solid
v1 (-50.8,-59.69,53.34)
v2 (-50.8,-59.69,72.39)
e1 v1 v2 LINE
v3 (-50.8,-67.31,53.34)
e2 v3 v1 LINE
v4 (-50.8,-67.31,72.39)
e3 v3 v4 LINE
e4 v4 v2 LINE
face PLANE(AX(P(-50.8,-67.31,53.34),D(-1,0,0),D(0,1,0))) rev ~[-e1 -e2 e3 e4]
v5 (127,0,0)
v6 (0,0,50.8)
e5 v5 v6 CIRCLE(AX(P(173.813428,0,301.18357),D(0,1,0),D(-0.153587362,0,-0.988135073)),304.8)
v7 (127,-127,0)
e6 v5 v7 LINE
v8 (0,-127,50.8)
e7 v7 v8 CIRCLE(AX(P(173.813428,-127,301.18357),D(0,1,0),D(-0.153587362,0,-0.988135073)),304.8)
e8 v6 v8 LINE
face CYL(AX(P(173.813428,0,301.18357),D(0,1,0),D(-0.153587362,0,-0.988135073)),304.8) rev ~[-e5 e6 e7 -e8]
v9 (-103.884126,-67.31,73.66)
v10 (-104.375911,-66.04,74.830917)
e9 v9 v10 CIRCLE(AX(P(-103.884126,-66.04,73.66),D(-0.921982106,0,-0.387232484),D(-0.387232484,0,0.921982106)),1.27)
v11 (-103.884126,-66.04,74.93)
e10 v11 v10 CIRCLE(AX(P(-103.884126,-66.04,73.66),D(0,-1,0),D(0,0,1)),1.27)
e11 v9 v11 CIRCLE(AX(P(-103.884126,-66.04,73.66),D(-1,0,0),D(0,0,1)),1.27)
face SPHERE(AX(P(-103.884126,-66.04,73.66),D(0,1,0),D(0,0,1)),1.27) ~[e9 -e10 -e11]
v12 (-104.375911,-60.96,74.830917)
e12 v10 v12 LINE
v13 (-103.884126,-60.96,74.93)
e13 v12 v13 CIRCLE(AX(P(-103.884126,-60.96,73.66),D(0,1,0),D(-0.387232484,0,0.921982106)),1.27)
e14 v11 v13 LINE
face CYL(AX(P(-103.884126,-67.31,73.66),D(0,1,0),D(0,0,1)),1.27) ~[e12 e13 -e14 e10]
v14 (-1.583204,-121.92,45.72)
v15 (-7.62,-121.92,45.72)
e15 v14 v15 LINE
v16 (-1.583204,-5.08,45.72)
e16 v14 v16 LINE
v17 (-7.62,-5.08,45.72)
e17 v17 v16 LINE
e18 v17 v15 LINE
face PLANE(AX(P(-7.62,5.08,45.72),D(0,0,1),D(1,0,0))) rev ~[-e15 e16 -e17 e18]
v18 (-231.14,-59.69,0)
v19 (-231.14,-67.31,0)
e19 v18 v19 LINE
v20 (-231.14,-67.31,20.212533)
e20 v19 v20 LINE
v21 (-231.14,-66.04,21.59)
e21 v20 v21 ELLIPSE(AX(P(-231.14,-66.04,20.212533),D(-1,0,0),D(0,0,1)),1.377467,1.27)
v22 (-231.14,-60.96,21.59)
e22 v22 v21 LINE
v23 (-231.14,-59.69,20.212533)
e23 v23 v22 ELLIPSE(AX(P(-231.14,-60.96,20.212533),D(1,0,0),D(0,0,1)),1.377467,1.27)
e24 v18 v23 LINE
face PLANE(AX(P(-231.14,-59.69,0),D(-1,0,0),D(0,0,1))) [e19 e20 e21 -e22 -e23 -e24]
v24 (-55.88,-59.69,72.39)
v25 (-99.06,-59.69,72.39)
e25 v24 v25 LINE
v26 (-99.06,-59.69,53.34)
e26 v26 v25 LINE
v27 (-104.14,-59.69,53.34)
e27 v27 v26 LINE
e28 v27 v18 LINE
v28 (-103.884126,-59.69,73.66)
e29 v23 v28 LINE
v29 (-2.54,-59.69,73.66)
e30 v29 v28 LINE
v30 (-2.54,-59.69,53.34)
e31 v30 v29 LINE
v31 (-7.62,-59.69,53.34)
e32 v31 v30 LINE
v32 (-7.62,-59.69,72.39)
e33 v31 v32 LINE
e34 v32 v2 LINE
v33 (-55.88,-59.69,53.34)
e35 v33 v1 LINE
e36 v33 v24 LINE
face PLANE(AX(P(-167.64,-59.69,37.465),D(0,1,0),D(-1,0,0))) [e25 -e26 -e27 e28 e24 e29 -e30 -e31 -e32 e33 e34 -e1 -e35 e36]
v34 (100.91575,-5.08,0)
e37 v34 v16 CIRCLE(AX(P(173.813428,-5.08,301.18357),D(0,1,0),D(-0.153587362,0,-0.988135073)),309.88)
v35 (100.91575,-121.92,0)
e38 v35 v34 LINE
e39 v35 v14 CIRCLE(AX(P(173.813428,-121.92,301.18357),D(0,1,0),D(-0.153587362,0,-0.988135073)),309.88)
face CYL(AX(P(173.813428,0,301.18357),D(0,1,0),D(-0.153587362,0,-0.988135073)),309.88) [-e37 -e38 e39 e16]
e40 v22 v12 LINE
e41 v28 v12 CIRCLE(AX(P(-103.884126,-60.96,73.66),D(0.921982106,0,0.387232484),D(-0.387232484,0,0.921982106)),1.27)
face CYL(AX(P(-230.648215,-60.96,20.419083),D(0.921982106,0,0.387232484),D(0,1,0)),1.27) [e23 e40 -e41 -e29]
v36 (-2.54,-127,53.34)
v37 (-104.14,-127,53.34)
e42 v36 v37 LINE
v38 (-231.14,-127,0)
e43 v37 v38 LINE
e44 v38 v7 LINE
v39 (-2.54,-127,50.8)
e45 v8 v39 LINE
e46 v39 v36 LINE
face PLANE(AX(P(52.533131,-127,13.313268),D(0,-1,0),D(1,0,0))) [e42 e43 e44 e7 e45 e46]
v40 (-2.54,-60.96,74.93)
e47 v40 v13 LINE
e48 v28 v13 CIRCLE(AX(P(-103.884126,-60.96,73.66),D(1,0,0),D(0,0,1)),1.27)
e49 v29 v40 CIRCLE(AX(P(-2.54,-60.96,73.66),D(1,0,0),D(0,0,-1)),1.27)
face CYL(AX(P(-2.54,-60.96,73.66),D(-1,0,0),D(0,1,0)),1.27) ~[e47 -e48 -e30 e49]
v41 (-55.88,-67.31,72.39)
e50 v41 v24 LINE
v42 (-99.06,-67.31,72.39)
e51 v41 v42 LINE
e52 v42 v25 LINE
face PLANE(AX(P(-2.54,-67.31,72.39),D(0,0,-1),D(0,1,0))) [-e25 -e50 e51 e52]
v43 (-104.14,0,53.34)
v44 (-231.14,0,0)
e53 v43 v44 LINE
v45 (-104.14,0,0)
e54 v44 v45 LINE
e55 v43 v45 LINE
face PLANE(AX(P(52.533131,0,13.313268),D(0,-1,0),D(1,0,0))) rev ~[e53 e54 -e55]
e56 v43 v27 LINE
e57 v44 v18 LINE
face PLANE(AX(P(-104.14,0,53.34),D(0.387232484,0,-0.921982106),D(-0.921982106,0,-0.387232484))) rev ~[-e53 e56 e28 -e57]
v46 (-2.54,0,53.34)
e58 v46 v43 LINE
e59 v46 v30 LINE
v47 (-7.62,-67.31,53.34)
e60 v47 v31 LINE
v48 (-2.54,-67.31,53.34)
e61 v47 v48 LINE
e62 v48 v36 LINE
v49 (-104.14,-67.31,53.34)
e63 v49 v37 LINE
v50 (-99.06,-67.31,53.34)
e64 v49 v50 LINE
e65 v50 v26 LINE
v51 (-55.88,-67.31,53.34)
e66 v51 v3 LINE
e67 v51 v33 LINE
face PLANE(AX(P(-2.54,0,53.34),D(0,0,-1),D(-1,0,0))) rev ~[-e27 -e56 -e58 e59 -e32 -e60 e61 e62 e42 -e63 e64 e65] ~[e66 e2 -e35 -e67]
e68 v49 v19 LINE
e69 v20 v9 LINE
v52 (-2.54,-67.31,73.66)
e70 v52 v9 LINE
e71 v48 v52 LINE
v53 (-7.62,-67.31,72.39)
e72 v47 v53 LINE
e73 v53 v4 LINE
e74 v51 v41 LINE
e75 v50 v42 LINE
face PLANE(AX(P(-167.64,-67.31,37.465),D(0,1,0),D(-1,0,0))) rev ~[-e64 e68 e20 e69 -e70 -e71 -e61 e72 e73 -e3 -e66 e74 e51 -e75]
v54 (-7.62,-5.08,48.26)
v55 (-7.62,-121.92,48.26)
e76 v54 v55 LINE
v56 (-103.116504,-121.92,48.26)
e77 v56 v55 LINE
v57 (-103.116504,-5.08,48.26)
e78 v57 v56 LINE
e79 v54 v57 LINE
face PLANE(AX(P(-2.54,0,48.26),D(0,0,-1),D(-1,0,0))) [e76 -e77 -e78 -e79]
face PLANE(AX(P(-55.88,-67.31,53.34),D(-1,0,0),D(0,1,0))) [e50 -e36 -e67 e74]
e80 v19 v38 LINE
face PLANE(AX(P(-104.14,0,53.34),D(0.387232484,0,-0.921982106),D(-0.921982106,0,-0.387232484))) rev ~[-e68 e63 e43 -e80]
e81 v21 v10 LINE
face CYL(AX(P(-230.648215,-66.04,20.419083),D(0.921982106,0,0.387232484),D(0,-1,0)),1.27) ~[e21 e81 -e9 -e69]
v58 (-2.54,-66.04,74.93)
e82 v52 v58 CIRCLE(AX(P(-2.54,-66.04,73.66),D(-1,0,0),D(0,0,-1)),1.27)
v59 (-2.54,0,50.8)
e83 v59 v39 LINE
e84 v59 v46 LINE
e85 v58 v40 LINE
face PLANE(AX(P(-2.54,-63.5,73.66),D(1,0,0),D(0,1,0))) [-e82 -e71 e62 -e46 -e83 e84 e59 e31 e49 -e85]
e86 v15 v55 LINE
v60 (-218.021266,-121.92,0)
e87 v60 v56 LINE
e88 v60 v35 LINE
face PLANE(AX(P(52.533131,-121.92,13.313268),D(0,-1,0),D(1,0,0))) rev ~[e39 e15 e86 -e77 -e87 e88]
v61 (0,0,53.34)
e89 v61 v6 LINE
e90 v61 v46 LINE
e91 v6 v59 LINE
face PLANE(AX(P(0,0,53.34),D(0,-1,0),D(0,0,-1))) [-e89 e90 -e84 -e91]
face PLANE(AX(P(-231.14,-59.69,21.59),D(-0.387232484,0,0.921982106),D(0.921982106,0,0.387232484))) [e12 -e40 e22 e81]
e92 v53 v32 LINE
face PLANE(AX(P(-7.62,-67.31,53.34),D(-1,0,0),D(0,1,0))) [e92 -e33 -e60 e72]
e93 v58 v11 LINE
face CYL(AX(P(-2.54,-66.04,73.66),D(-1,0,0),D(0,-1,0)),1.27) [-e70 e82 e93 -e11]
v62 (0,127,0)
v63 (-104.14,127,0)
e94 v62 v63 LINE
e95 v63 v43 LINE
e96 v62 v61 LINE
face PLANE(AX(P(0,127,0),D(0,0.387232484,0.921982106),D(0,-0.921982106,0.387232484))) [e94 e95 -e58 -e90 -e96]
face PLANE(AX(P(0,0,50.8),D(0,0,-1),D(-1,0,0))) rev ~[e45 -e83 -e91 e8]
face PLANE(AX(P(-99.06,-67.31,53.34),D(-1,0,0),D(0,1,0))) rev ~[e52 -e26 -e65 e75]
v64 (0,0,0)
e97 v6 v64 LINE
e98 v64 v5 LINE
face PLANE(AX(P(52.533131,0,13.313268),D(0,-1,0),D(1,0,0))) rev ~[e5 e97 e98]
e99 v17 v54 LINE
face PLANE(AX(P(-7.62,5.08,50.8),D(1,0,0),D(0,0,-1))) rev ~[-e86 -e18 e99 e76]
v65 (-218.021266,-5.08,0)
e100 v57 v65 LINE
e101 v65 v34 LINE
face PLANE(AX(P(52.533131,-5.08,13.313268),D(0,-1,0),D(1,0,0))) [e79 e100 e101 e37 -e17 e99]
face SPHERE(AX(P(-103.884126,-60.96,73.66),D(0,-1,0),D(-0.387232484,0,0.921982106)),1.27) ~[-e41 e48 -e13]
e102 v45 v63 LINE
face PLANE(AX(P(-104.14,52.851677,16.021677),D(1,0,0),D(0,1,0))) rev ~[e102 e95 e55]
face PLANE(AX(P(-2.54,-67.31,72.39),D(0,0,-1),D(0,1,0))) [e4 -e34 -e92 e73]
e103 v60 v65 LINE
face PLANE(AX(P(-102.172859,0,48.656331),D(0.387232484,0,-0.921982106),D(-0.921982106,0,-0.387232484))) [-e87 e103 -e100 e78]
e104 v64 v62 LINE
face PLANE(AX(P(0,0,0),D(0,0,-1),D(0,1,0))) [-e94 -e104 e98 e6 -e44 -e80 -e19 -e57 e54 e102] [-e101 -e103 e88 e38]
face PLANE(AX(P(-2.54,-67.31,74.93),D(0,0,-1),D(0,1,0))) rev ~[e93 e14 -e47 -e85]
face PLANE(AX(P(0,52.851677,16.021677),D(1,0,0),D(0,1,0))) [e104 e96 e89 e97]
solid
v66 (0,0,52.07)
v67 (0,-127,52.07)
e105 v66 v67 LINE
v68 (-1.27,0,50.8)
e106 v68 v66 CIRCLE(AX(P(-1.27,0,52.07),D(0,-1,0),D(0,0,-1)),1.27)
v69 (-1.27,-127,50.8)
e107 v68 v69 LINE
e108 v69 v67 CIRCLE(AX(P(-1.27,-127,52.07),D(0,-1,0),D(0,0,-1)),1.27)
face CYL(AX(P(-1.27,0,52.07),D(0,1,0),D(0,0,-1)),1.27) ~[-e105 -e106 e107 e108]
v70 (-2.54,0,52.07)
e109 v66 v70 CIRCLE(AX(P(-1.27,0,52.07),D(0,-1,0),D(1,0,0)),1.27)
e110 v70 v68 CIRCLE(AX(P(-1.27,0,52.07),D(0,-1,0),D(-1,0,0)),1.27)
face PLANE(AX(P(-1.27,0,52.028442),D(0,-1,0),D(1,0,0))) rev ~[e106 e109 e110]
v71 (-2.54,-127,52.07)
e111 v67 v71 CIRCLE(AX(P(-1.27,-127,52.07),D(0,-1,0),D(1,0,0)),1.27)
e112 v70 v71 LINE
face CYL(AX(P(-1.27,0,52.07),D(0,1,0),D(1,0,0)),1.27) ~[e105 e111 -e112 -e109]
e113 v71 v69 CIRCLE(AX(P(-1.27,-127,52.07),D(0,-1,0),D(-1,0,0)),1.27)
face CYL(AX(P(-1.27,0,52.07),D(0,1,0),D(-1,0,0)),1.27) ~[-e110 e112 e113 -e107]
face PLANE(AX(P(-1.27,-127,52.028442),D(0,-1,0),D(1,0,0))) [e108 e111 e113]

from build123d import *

# Parameters (mm, degrees)
F1_DEPTH     = 127
F2_W         = 5.08
F2_H         = 7.62
F3_DEPTH     = 19.05
F4_W         = 7.62
F4_H         = 2.54
F5_DEPTH     = 101.6
F6_T         = 5.08
F6_T3_DEPTH  = 17.78
F6_T5_DEPTH  = 15.24
F6_T7_DEPTH  = 15.24
F6_T9_DEPTH  = 15.24
F6_T11_DEPTH = 137.16
F8_DEPTH     = 7.62
F10_DEPTH    = 104.14
F11_R        = 1.27


# Not quite as in the source:
# - a shell that OpenCascade refuses in one call is made with other operations: the cavity is built on its own and cut out
# - a feature names something its author has since deleted; it is built from what else it names


with BuildPart() as f1:
    # F0 (on Front) → F1 (new body)
    with BuildSketch(Plane.XZ):
        with BuildLine():
            Line((0, 50.8), (0, 0))
            Line((0, 0), (127, 0))
            ThreePointArc((127, 0), (60.6135499229, 18.1838748072), (0, 50.8))
        make_face()
        Polygon((-104.14, 0), (-2.54, 0), (-2.54, 50.8), (-2.54, 52.07), (-2.54, 53.34), (-104.14, 53.34), align=None)
        Polygon((-2.54, 0), (0, 0), (0, 50.8), (-1.27, 50.8), (-2.54, 50.8), align=None)
        Polygon((-231.14, 0), (-104.14, 0), (-104.14, 53.34), align=None)
    extrude(amount=F1_DEPTH)

    # F2 (on face) → F3 (join)
    with BuildSketch(Plane.XY.offset(53.34)):
        with Locations((-101.6, -63.5)):
            Rectangle(F2_W, F2_H)
        with Locations((-5.08, -63.5)):
            Rectangle(F2_W, F2_H)
        with Locations((-53.34, -63.5)):
            Rectangle(F2_W, F2_H)
    extrude(amount=F3_DEPTH)

    # F4 (on face) → F5 (join)
    with BuildSketch(Plane.YZ.offset(-2.54)):
        with Locations((-63.5, 73.66)):
            Rectangle(F4_W, F4_H)
    extrude(amount=-F5_DEPTH)

    # F6: shell of thickness 5.08, made by hand


with BuildPart() as f1b:
    # F0 (on Front) → F1, piece 2 (new body)
    with BuildSketch(Plane.XZ):
        with BuildLine():
            ThreePointArc((-2.54, 52.07), (-2.1680256121, 51.1719743879), (-1.27, 50.8))
            ThreePointArc((-1.27, 50.8), (-0.3719743879, 51.1719743879), (0, 52.07))
            ThreePointArc((0, 52.07), (-1.27, 53.34), (-2.54, 52.07))
        make_face()
    extrude(amount=F1_DEPTH)


with BuildPart() as f6_core1:
    # F6_t2: copy of F1
    add(f1.part)

    # the walls: a layer under each face that stays
    f6_faces = [f6_core1.faces().sort_by_distance(p)[0] for p in [
        (60.6135499229, -63.5, 18.1838748072),
        (-52.07, -127, 26.67),
        (-167.64, -63.5, 26.67),
        (-104.14, -63.5, 64.135),
        (-53.34, -67.31, 64.135),
        (-99.06, -63.5, 62.865),
        (-77.47, -63.5, 72.39),
        (-55.88, -63.5, 62.865),
        (-50.8, -63.5, 62.865),
        (-29.21, -63.5, 72.39),
        (-7.62, -63.5, 62.865),
        (-53.34, -63.5, 74.93),
        (-53.34, -59.69, 64.135),
        (-19.4733333333, -105.8333333333, 53.34),
        (-2.54, -63.5, 62.865),
        (-52.07, 0, 26.67),
        (-1.27, -63.5, 50.8),
    ]]
    thicken(f6_faces, amount=-F6_T, mode=Mode.SUBTRACT)

    # F6_s4 → F6_t3 (cut)
    with BuildSketch(Plane.XZ.offset(54.61)):
        Polygon((-104.2104714102, 53.386836691), (-102.1728589795, 48.6563309035), (-99.06, 49.9637316749), (-99.06, 53.34), align=None)
        Polygon((-99.0092, 53.3908), (-104.14, 53.34), (-104.14, 48.26), (-99.06, 48.26), align=None)
        Polygon((-99.0092, 72.3392), (-104.14, 72.39), (-104.14, 77.47), (-99.06, 77.47), align=None)
        Polygon((-55.9308, 72.3392), (-55.88, 77.47), (-50.8, 77.47), (-50.8, 72.39), align=None)
        Polygon((-55.9308, 53.3908), (-50.8, 53.34), (-50.8, 48.26), (-55.88, 48.26), align=None)
        Polygon((-50.7492, 53.3908), (-55.88, 53.34), (-55.88, 48.26), (-50.8, 48.26), align=None)
        Polygon((-50.7492, 72.3392), (-55.88, 72.39), (-55.88, 77.47), (-50.8, 77.47), align=None)
        Polygon((-7.6708, 72.3392), (-7.62, 77.47), (-2.54, 77.47), (-2.54, 72.39), align=None)
        Polygon((-7.6708, 53.3908), (-2.54, 53.34), (-2.54, 48.26), (-7.62, 48.26), align=None)
    extrude(amount=F6_T3_DEPTH, mode=Mode.SUBTRACT)

    # F6_s6 → F6_t5 (cut)
    with BuildSketch(Plane.YZ.offset(-60.96)):
        Polygon((-67.3608, 53.3908), (-62.23, 53.34), (-62.23, 48.26), (-67.31, 48.26), align=None)
        Polygon((-59.6392, 53.3908), (-64.77, 53.34), (-64.77, 48.26), (-59.69, 48.26), align=None)
    extrude(amount=F6_T5_DEPTH, mode=Mode.SUBTRACT)

    # F6_s8 → F6_t7 (cut)
    with BuildSketch(Plane.YZ.offset(-109.22)):
        Polygon((-67.3608, 53.3908), (-62.23, 53.34), (-62.23, 48.26), (-67.31, 48.26), align=None)
        Polygon((-59.6392, 53.3908), (-64.77, 53.34), (-64.77, 48.26), (-59.69, 48.26), align=None)
    extrude(amount=F6_T7_DEPTH, mode=Mode.SUBTRACT)

    # F6_s10 → F6_t9 (cut)
    with BuildSketch(Plane.YZ.offset(-12.7)):
        Polygon((-67.3608, 53.3908), (-62.23, 53.34), (-62.23, 48.26), (-67.31, 48.26), align=None)
        Polygon((-59.6392, 53.3908), (-64.77, 53.34), (-64.77, 48.26), (-59.69, 48.26), align=None)
    extrude(amount=F6_T9_DEPTH, mode=Mode.SUBTRACT)

    # F6_s12 → F6_t11 (cut)
    with BuildSketch(Plane.XZ.offset(-5.08)):
        Polygon((-2.4892, 50.8508), (-7.62, 50.8), (-7.62, 45.72), (-2.54, 45.72), align=None)
    extrude(amount=F6_T11_DEPTH, mode=Mode.SUBTRACT)


with BuildPart() as f1_1:
    add(f1.part)

    # what is left inside the walls is the cavity
    f6_cavity = [f6_core1.part.solids().sort_by_distance(p)[0] for p in [
        (-58.552758, -82.973333, 0.0508),
    ]]
    add(f6_cavity, mode=Mode.SUBTRACT)

    # F7 (on face) → F8 (join)
    with BuildSketch(Plane(origin=(0, -59.69, 0), x_dir=(-1, 0, 0), z_dir=(0, 1, 0))):
        Polygon((231.14, 21.59), (104.14, 74.93), (104.14, 53.34), (231.14, 0), align=None)
    extrude(amount=-F8_DEPTH)

    # F9 (on Right) → F10 (join)
    with BuildSketch(Plane.YZ):
        Polygon((127, 0), (0, 53.34), (0, 0), align=None)
    extrude(amount=-F10_DEPTH)

    # F11
    f11_edges = [f1_1.edges().sort_by_distance(p)[0] for p in [
        (-53.34, -67.31, 74.93),
        (-167.64, -67.31, 48.26),
        (-104.14, -63.5, 74.93),
        (-167.64, -59.69, 48.26),
        (-53.34, -59.69, 74.93),
    ]]
    fillet(f11_edges, radius=F11_R)


solid = Compound([f1b.part, f1_1.part])
